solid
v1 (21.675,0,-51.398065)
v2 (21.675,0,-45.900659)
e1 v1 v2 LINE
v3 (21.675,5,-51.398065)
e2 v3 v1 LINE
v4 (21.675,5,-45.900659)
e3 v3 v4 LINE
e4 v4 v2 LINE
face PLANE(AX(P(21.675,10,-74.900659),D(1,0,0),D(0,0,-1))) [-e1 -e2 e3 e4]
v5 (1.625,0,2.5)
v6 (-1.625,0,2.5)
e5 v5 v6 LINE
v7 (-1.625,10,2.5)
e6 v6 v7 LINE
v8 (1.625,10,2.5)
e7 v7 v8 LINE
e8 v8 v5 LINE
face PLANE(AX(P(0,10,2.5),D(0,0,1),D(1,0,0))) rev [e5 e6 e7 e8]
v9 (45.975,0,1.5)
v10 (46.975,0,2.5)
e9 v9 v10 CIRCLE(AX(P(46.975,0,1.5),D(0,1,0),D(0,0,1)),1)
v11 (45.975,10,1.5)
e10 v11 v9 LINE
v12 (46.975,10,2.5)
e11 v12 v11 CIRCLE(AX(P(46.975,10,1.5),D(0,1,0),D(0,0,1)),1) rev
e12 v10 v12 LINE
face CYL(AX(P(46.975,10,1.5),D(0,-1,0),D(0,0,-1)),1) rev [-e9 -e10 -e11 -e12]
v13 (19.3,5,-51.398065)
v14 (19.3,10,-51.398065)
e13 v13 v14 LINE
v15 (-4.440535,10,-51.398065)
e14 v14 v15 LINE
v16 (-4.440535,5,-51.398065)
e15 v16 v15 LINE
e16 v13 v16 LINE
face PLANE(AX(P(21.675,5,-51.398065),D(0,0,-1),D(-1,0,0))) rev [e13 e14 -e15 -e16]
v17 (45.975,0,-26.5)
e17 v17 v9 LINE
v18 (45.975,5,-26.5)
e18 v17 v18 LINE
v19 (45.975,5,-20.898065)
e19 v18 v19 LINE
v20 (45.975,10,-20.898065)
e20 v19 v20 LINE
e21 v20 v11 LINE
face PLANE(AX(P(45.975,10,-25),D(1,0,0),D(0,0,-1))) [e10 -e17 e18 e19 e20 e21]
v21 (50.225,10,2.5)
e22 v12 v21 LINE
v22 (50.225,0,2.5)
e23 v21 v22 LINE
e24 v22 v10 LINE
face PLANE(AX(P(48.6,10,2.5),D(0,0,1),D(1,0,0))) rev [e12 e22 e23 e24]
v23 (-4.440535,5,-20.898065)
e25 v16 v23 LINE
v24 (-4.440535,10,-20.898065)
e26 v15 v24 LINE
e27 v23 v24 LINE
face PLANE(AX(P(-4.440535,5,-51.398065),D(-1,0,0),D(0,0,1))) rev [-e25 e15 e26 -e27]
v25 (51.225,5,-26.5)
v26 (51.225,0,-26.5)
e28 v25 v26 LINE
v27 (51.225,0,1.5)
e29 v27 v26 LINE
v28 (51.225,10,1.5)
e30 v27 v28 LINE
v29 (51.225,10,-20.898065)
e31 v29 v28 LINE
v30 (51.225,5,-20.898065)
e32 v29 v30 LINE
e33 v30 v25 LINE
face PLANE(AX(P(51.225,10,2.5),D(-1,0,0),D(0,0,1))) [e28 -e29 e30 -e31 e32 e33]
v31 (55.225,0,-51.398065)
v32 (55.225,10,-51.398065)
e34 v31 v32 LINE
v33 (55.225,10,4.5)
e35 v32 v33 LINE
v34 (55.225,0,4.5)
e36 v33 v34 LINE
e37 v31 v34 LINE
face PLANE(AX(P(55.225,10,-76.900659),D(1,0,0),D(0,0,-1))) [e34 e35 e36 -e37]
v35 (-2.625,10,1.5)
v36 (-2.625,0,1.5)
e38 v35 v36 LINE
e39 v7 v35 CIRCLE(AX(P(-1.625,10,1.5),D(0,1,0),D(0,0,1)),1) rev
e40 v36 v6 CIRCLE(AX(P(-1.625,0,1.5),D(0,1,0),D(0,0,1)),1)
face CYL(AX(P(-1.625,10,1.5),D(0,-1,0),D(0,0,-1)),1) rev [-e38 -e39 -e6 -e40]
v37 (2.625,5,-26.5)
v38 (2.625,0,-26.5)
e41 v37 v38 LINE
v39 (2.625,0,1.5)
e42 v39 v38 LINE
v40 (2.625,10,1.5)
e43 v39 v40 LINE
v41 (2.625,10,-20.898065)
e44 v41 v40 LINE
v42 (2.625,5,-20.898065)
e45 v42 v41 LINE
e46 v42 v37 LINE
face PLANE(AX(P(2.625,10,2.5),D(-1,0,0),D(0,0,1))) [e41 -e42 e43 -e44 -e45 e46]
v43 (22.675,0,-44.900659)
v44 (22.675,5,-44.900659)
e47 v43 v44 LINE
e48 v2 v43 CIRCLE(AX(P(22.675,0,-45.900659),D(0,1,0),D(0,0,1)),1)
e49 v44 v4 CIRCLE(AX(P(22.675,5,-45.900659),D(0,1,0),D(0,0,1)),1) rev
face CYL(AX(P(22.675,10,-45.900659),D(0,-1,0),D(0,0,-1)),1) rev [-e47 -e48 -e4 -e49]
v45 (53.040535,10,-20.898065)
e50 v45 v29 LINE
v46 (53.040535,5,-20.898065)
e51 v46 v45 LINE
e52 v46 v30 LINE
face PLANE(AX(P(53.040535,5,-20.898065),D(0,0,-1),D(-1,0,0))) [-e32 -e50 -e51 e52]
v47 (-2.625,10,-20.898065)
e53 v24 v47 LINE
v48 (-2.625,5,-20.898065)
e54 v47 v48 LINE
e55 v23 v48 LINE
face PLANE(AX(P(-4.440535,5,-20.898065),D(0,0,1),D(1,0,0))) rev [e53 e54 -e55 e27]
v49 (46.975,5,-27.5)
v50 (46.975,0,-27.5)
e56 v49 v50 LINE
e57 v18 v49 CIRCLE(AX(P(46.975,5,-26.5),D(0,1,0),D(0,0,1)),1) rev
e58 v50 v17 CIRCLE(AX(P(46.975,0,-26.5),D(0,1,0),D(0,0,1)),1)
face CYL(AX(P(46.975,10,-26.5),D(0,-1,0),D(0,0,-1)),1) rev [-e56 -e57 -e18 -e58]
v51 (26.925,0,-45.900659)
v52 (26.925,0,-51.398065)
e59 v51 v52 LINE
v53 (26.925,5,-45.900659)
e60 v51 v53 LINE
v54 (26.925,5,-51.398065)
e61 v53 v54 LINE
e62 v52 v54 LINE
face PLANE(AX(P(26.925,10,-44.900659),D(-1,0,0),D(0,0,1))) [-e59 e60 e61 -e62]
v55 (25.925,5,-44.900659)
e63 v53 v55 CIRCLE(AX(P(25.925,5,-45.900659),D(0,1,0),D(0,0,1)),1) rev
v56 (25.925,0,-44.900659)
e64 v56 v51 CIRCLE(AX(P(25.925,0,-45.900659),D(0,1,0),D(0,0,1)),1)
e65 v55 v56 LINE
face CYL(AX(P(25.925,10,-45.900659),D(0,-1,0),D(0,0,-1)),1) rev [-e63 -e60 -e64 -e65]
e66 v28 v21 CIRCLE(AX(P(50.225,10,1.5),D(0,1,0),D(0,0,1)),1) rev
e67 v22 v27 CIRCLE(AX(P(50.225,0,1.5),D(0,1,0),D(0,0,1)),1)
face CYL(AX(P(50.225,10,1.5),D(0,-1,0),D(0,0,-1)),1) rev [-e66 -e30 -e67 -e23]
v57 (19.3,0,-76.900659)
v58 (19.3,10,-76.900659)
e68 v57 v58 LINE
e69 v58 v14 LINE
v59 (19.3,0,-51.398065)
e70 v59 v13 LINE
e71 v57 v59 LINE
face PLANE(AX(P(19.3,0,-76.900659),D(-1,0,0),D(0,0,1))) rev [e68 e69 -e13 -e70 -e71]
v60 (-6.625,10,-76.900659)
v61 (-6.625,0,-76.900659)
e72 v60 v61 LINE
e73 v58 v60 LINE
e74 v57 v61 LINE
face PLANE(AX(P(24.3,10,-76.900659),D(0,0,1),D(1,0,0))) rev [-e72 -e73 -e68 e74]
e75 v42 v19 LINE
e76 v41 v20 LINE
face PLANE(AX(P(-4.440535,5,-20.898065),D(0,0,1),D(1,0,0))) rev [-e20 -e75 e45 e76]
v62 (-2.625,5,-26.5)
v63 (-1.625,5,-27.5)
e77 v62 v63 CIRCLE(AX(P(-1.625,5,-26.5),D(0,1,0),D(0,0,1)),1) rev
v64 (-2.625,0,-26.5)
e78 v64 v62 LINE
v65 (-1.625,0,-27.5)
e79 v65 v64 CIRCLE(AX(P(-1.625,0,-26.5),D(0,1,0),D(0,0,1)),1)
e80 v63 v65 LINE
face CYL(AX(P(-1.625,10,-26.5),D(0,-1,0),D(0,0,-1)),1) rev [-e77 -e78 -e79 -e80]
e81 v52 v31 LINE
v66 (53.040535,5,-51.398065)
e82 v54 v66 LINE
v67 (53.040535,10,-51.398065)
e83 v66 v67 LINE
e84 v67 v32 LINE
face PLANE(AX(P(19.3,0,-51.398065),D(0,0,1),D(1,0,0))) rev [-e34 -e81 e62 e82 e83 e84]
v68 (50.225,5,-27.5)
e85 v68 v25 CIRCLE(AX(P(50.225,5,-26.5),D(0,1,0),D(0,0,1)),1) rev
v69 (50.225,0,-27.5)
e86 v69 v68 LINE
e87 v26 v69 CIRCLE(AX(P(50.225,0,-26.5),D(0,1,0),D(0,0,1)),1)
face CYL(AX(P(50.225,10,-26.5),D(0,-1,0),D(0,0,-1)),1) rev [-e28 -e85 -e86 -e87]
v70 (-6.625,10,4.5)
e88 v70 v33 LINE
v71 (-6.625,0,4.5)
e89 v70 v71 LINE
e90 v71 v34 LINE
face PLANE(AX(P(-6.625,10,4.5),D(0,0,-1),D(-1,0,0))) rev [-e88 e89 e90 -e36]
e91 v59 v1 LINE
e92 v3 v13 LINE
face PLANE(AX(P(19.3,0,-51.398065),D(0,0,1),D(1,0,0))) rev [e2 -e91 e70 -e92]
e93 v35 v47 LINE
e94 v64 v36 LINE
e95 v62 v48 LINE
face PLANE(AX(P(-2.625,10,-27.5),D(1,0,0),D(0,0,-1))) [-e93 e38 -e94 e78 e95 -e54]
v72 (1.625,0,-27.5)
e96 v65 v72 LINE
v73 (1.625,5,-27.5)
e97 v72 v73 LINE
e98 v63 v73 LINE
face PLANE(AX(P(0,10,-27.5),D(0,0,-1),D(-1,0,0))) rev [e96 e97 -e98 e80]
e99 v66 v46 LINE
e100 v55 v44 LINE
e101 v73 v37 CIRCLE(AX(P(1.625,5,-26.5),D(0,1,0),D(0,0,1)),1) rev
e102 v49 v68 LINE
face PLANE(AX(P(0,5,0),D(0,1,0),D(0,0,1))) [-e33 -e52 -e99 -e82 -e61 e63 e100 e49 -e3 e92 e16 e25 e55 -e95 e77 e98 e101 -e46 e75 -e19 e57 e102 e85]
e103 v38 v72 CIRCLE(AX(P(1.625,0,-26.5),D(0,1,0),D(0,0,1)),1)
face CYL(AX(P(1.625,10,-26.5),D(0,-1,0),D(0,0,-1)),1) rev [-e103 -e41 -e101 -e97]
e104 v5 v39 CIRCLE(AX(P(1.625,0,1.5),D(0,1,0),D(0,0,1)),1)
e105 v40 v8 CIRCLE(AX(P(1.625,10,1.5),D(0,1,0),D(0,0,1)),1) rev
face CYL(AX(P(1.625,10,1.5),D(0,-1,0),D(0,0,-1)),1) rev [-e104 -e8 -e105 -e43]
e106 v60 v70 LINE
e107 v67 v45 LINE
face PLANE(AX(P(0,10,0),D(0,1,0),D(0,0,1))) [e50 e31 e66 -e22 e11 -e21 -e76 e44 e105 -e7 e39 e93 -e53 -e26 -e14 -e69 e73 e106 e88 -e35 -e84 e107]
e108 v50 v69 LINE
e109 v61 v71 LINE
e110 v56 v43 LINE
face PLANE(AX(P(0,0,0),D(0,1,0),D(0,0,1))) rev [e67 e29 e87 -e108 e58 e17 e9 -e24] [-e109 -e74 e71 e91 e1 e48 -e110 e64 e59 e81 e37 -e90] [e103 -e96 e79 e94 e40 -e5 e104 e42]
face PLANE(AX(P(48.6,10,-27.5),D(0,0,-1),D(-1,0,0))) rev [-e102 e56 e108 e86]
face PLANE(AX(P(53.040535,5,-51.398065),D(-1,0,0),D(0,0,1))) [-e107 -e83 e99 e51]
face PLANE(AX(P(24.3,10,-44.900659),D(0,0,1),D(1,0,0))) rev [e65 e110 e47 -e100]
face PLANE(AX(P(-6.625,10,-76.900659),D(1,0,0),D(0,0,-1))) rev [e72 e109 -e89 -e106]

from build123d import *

# Parameters (mm, degrees)
BOSS_EXTRUDE5_DEPTH = 10
CUT_EXTRUDE6_DEPTH  = 5
FILLET4_R           = 1
MIRROR25_DEPTH      = 10
MIRROR25_2_DEPTH    = 5
SKETCH20_W          = 35.925
SKETCH20_H          = 25.502594227
CUT_EXTRUDE7_DEPTH  = 10


# Read off the part's stored shape, not the designer's step: Mirror25
with BuildPart() as part:
    # Sketch15 → Boss-Extrude5 (new body)
    with BuildSketch(Plane(origin=(0, 0, 0), x_dir=(1, 0, 0), z_dir=(0, 1, 0))):
        Polygon((24.3, 76.900659127), (-6.625, 76.900659127), (-6.625, -4.5), (24.3, -4.5), (24.3, 44.900659127), (21.675, 44.900659127), (21.675, 47.400659127), (21.675, 72.400659127), (21.675, 74.900659127), (24.3, 74.900659127), align=None)
        Polygon((-2.625, 25), (-2.625, 0), (-2.625, -2.5), (0, -2.5), (2.625, -2.5), (2.625, 0), (2.625, 25), (2.625, 27.5), (0, 27.5), (-2.625, 27.5), align=None, mode=Mode.SUBTRACT)
    extrude(amount=BOSS_EXTRUDE5_DEPTH)

    # Sketch18 → Cut-Extrude6 (cut)
    with BuildSketch(Plane(origin=(0, 10, 0), x_dir=(1, 0, 0), z_dir=(0, 1, 0))):
        Polygon((21.675, 51.3980649), (-4.44053483, 51.3980649), (-4.44053483, 20.8980649), (24.3, 20.8980649), (24.3, 51.3980649), align=None)
    extrude(amount=-CUT_EXTRUDE6_DEPTH, mode=Mode.SUBTRACT)

    # Fillet4
    fillet4_edges = [part.edges().sort_by_distance(p)[0] for p in [
        (21.675, 5, -74.900659127),
        (-2.625, 5, 2.5),
        (2.625, 5, 2.5),
        (2.625, 2.5, -27.5),
        (-2.625, 2.5, -27.5),
        (21.675, 2.5, -44.900659127),
    ]]
    fillet(fillet4_edges, radius=FILLET4_R)

    # Mirror25 outline → Mirror25 (add)
    with BuildSketch(Plane(origin=(0, 0, 0), x_dir=(1, 0, 0), z_dir=(0, 1, 0))):
        with BuildLine():
            Line((45.975, 20.8980649), (24.3, 20.8980649))
            Line((24.3, 20.8980649), (24.3, -4.5))
            Line((24.3, -4.5), (55.225, -4.5))
            Line((55.225, -4.5), (55.225, 76.900659127))
            Line((55.225, 76.900659127), (24.3, 76.900659127))
            Line((24.3, 76.900659127), (24.3, 74.900659127))
            Line((24.3, 74.900659127), (25.925, 74.900659127))
            ThreePointArc((25.925, 74.900659127), (26.632106781, 74.607765908), (26.925, 73.900659127))
            Line((26.925, 73.900659127), (26.925, 51.3980649))
            Line((26.925, 51.3980649), (53.04053483, 51.3980649))
            Line((53.04053483, 51.3980649), (53.04053483, 20.8980649))
            Line((53.04053483, 20.8980649), (51.225, 20.8980649))
            Line((51.225, 20.8980649), (51.225, -1.5))
            ThreePointArc((51.225, -1.5), (50.932106781, -2.207106781), (50.225, -2.5))
            Line((50.225, -2.5), (46.975, -2.5))
            ThreePointArc((46.975, -2.5), (46.267893219, -2.207106781), (45.975, -1.5))
            Line((45.975, -1.5), (45.975, 20.8980649))
        make_face()
    extrude(amount=MIRROR25_DEPTH)

    # Mirror25 2 outline → Mirror25 2 (add)
    with BuildSketch(Plane(origin=(0, 0, 0), x_dir=(1, 0, 0), z_dir=(0, 1, 0))):
        with BuildLine():
            Line((25.925, 44.900659127), (24.3, 44.900659127))
            Line((24.3, 44.900659127), (24.3, 20.8980649))
            Line((24.3, 20.8980649), (45.975, 20.8980649))
            Line((45.975, 20.8980649), (45.975, 26.5))
            ThreePointArc((45.975, 26.5), (46.267893219, 27.207106781), (46.975, 27.5))
            Line((46.975, 27.5), (50.225, 27.5))
            ThreePointArc((50.225, 27.5), (50.932106781, 27.207106781), (51.225, 26.5))
            Line((51.225, 26.5), (51.225, 20.8980649))
            Line((51.225, 20.8980649), (53.04053483, 20.8980649))
            Line((53.04053483, 20.8980649), (53.04053483, 51.3980649))
            Line((53.04053483, 51.3980649), (26.925, 51.3980649))
            Line((26.925, 51.3980649), (26.925, 45.900659127))
            ThreePointArc((26.925, 45.900659127), (26.632106781, 45.193552346), (25.925, 44.900659127))
        make_face()
    extrude(amount=MIRROR25_2_DEPTH)

    # Sketch20 → Cut-Extrude7 (cut)
    with BuildSketch(Plane(origin=(0, 10, 0), x_dir=(1, 0, 0), z_dir=(0, 1, 0))):
        with Locations((37.2625, 64.149362014)):
            Rectangle(SKETCH20_W, SKETCH20_H)
    extrude(amount=-CUT_EXTRUDE7_DEPTH, mode=Mode.SUBTRACT)


solid = part.part
